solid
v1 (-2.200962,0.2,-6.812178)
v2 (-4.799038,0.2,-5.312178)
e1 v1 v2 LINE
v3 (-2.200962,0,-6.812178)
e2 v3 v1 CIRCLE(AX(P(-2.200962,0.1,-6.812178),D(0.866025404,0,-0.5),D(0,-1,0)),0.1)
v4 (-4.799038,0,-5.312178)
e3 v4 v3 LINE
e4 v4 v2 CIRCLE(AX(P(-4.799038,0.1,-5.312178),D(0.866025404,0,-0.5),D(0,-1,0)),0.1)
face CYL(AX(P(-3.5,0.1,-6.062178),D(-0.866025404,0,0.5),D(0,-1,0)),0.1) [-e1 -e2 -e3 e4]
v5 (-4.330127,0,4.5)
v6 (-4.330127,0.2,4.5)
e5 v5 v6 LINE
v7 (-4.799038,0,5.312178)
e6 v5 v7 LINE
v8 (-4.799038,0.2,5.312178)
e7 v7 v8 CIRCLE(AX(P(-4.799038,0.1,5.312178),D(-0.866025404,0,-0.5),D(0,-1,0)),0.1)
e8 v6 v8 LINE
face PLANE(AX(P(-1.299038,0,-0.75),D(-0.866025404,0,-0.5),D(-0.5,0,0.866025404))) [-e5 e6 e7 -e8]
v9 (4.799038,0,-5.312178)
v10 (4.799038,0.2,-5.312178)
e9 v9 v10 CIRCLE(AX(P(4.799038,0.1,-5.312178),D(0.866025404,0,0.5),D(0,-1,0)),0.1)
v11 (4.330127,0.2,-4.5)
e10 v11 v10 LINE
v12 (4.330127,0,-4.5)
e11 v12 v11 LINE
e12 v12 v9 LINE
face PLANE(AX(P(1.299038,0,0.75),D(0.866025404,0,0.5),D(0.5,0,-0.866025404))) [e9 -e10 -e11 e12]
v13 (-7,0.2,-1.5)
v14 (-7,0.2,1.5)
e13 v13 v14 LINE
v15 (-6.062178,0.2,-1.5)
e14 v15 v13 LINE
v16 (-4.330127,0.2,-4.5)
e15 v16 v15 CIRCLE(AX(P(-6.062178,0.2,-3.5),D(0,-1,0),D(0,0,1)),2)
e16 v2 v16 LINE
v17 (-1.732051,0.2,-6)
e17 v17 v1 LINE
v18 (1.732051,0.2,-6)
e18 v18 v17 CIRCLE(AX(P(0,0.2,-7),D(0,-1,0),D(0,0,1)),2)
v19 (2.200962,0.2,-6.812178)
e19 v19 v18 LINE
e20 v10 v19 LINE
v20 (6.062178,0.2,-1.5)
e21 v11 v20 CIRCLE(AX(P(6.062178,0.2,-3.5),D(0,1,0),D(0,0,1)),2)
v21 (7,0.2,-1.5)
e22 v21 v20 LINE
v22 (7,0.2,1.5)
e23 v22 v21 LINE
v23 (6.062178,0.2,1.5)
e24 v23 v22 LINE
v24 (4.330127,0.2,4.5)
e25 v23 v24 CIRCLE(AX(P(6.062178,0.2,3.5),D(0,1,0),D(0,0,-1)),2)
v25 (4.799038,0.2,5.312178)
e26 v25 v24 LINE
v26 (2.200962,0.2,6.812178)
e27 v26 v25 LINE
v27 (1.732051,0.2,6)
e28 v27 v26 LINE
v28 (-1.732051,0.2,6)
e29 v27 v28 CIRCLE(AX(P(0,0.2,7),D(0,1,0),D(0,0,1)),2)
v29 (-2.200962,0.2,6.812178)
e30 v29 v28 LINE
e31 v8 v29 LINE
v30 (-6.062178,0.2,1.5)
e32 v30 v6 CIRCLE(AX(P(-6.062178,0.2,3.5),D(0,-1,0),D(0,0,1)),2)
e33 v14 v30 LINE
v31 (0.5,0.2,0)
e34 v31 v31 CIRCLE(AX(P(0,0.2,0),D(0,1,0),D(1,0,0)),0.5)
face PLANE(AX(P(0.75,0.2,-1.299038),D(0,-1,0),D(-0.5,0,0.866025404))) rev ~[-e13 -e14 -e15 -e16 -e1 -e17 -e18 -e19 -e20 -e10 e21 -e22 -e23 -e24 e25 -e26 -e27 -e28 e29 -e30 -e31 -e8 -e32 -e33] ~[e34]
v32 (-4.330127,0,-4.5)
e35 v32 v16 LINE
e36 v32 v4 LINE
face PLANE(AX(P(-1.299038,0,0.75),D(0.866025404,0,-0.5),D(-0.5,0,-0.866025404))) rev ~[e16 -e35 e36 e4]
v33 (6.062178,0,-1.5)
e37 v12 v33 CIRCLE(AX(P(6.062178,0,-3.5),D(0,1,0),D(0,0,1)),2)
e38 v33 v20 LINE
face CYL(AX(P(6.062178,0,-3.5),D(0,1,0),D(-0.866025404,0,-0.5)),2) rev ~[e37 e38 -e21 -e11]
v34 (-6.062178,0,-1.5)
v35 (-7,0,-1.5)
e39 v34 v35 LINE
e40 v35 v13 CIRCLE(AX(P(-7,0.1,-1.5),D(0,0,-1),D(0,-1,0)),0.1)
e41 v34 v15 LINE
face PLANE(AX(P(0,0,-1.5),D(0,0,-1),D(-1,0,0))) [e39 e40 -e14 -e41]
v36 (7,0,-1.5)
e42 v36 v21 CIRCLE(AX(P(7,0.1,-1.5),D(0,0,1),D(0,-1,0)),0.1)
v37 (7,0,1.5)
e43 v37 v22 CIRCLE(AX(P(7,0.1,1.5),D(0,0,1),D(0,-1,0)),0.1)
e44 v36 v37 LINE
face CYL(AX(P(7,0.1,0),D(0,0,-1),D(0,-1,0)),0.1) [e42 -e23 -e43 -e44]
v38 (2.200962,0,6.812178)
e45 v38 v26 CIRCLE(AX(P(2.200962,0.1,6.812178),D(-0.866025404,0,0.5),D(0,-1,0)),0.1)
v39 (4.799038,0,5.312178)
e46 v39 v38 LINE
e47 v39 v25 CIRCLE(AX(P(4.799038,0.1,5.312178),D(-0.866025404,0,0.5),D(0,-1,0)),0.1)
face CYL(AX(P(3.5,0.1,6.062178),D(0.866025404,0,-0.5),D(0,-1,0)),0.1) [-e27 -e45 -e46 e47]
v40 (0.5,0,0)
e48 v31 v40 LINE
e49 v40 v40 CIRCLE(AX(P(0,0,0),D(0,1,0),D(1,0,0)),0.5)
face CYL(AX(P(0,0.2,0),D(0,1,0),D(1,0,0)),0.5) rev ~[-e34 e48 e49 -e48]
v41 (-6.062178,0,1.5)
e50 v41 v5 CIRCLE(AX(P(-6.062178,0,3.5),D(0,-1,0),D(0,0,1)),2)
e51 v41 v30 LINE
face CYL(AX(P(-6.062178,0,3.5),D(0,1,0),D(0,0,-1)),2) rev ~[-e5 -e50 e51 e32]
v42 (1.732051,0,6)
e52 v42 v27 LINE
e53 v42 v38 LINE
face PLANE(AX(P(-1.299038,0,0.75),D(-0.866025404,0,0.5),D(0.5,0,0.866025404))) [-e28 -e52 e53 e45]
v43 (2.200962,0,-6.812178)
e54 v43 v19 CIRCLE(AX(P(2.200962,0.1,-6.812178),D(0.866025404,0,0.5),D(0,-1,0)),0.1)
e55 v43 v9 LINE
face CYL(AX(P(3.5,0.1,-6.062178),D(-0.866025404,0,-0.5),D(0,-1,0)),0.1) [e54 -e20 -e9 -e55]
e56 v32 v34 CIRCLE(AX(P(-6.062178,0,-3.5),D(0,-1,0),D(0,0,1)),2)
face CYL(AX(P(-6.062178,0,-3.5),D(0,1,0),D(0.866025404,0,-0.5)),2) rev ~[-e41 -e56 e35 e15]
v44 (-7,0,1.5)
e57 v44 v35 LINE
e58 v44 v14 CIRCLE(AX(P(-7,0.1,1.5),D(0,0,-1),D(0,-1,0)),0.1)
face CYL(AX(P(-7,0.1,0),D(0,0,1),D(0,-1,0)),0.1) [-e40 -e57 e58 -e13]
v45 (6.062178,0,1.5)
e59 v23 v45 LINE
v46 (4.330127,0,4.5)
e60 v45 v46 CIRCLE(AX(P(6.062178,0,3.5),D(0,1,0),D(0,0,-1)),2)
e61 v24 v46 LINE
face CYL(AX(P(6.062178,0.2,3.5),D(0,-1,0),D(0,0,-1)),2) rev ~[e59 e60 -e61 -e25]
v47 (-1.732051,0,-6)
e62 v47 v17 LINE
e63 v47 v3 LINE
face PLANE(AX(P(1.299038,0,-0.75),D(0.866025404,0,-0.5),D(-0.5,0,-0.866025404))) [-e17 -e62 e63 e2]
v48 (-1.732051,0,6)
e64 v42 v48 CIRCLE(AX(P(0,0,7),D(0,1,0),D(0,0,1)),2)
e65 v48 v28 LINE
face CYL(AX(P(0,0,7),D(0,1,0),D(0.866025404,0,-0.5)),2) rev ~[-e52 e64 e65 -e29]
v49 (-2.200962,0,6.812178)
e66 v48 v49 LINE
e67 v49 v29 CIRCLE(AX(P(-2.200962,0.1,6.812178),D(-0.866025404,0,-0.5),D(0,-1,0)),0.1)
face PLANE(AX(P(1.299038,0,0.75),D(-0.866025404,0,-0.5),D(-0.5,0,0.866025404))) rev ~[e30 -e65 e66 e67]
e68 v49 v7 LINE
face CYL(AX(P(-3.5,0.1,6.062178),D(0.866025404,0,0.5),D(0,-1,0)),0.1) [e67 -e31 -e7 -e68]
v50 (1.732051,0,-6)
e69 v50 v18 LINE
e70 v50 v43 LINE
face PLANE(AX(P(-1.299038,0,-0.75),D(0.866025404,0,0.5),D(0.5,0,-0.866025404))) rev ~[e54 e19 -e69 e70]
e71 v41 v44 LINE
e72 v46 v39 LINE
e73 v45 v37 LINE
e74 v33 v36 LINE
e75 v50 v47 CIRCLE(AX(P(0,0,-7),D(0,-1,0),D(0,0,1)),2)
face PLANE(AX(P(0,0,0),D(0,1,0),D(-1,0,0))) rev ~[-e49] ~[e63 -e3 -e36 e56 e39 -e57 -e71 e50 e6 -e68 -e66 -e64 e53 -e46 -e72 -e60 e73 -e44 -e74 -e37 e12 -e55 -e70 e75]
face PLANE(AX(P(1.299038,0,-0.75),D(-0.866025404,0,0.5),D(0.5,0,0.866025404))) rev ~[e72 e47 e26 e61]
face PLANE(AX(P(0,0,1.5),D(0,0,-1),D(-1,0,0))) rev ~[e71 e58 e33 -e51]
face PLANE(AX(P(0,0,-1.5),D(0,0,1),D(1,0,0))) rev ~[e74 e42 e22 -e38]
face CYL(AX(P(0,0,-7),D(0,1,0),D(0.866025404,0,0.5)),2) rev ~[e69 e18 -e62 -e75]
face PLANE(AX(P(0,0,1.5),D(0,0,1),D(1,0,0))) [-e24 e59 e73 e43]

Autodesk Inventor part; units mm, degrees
ref_plane "YZ Plane" through (0, 0, 0) normal (1, 0, 0) x (0, 1, 0)
ref_plane "XZ Plane" through (0, 0, 0) normal (0, 1, 0) x (-1, 0, 0)
ref_plane "XY Plane" through (0, 0, 0) normal (0, 0, 1) x (1, 0, 0)
sketch "Sketch1" plane through (0, 0, 0) normal (0, 1, 0) x (-1, 0, 0)
  circle A0 centre (0, 0) radius 1.5
  dimension "d0" = 3
extrude "Extrusion1" add sketch "Sketch1" along normal blind 0.2
sketch "Sketch2" plane through (0, 0, 0) normal (0, 0, 1) x (1, 0, 0)
  line L0 (0, 0) -> (0, 0.1)
  line L1 (0, 0.1) -> (7, 0.1) construction
  line L2 (0, 0) -> (7, 0)
  line L3 (7, 0.2) -> (0, 0.2)
  arc A0 (0, 0.2) -> (0, 0) centre (0, 0.1) ccw
  arc A1 (7, 0) -> (7, 0.2) centre (7, 0.1) ccw
  line L4 (1.5, 0.2) -> (-1.5, 0.2) projected
  point P0 (3.5, 0.1)
  dimension "d3" = 0.1
  dimension "d4" = 7
  dimension "d5" = 0.2
extrude "Extrusion2" add sketch "Sketch2" along normal mid plane 3
pattern_circular "Circular Pattern1" count 6 over 360 about axis through (0, 0, 0) along (0, 1, 0) of "Extrusion2"
sketch "Sketch3" plane through (0, 0.2, 0) normal (0, 1, 0) x (1, 0, 0)
  circle A0 centre (0, 0) radius 0.5
  dimension "d11" = 1
extrude "Extrusion3" cut sketch "Sketch3" against normal blind 1
fillet "Fillet1" radius 2 6 edges at (0, 0.1, -3) (-2.5981, 0.1, -1.5) (-2.5981, 0.1, 1.5) (0, 0.1, 3) (2.5981, 0.1, 1.5) (2.5981, 0.1, -1.5)
properties part number "mid_7mm"
